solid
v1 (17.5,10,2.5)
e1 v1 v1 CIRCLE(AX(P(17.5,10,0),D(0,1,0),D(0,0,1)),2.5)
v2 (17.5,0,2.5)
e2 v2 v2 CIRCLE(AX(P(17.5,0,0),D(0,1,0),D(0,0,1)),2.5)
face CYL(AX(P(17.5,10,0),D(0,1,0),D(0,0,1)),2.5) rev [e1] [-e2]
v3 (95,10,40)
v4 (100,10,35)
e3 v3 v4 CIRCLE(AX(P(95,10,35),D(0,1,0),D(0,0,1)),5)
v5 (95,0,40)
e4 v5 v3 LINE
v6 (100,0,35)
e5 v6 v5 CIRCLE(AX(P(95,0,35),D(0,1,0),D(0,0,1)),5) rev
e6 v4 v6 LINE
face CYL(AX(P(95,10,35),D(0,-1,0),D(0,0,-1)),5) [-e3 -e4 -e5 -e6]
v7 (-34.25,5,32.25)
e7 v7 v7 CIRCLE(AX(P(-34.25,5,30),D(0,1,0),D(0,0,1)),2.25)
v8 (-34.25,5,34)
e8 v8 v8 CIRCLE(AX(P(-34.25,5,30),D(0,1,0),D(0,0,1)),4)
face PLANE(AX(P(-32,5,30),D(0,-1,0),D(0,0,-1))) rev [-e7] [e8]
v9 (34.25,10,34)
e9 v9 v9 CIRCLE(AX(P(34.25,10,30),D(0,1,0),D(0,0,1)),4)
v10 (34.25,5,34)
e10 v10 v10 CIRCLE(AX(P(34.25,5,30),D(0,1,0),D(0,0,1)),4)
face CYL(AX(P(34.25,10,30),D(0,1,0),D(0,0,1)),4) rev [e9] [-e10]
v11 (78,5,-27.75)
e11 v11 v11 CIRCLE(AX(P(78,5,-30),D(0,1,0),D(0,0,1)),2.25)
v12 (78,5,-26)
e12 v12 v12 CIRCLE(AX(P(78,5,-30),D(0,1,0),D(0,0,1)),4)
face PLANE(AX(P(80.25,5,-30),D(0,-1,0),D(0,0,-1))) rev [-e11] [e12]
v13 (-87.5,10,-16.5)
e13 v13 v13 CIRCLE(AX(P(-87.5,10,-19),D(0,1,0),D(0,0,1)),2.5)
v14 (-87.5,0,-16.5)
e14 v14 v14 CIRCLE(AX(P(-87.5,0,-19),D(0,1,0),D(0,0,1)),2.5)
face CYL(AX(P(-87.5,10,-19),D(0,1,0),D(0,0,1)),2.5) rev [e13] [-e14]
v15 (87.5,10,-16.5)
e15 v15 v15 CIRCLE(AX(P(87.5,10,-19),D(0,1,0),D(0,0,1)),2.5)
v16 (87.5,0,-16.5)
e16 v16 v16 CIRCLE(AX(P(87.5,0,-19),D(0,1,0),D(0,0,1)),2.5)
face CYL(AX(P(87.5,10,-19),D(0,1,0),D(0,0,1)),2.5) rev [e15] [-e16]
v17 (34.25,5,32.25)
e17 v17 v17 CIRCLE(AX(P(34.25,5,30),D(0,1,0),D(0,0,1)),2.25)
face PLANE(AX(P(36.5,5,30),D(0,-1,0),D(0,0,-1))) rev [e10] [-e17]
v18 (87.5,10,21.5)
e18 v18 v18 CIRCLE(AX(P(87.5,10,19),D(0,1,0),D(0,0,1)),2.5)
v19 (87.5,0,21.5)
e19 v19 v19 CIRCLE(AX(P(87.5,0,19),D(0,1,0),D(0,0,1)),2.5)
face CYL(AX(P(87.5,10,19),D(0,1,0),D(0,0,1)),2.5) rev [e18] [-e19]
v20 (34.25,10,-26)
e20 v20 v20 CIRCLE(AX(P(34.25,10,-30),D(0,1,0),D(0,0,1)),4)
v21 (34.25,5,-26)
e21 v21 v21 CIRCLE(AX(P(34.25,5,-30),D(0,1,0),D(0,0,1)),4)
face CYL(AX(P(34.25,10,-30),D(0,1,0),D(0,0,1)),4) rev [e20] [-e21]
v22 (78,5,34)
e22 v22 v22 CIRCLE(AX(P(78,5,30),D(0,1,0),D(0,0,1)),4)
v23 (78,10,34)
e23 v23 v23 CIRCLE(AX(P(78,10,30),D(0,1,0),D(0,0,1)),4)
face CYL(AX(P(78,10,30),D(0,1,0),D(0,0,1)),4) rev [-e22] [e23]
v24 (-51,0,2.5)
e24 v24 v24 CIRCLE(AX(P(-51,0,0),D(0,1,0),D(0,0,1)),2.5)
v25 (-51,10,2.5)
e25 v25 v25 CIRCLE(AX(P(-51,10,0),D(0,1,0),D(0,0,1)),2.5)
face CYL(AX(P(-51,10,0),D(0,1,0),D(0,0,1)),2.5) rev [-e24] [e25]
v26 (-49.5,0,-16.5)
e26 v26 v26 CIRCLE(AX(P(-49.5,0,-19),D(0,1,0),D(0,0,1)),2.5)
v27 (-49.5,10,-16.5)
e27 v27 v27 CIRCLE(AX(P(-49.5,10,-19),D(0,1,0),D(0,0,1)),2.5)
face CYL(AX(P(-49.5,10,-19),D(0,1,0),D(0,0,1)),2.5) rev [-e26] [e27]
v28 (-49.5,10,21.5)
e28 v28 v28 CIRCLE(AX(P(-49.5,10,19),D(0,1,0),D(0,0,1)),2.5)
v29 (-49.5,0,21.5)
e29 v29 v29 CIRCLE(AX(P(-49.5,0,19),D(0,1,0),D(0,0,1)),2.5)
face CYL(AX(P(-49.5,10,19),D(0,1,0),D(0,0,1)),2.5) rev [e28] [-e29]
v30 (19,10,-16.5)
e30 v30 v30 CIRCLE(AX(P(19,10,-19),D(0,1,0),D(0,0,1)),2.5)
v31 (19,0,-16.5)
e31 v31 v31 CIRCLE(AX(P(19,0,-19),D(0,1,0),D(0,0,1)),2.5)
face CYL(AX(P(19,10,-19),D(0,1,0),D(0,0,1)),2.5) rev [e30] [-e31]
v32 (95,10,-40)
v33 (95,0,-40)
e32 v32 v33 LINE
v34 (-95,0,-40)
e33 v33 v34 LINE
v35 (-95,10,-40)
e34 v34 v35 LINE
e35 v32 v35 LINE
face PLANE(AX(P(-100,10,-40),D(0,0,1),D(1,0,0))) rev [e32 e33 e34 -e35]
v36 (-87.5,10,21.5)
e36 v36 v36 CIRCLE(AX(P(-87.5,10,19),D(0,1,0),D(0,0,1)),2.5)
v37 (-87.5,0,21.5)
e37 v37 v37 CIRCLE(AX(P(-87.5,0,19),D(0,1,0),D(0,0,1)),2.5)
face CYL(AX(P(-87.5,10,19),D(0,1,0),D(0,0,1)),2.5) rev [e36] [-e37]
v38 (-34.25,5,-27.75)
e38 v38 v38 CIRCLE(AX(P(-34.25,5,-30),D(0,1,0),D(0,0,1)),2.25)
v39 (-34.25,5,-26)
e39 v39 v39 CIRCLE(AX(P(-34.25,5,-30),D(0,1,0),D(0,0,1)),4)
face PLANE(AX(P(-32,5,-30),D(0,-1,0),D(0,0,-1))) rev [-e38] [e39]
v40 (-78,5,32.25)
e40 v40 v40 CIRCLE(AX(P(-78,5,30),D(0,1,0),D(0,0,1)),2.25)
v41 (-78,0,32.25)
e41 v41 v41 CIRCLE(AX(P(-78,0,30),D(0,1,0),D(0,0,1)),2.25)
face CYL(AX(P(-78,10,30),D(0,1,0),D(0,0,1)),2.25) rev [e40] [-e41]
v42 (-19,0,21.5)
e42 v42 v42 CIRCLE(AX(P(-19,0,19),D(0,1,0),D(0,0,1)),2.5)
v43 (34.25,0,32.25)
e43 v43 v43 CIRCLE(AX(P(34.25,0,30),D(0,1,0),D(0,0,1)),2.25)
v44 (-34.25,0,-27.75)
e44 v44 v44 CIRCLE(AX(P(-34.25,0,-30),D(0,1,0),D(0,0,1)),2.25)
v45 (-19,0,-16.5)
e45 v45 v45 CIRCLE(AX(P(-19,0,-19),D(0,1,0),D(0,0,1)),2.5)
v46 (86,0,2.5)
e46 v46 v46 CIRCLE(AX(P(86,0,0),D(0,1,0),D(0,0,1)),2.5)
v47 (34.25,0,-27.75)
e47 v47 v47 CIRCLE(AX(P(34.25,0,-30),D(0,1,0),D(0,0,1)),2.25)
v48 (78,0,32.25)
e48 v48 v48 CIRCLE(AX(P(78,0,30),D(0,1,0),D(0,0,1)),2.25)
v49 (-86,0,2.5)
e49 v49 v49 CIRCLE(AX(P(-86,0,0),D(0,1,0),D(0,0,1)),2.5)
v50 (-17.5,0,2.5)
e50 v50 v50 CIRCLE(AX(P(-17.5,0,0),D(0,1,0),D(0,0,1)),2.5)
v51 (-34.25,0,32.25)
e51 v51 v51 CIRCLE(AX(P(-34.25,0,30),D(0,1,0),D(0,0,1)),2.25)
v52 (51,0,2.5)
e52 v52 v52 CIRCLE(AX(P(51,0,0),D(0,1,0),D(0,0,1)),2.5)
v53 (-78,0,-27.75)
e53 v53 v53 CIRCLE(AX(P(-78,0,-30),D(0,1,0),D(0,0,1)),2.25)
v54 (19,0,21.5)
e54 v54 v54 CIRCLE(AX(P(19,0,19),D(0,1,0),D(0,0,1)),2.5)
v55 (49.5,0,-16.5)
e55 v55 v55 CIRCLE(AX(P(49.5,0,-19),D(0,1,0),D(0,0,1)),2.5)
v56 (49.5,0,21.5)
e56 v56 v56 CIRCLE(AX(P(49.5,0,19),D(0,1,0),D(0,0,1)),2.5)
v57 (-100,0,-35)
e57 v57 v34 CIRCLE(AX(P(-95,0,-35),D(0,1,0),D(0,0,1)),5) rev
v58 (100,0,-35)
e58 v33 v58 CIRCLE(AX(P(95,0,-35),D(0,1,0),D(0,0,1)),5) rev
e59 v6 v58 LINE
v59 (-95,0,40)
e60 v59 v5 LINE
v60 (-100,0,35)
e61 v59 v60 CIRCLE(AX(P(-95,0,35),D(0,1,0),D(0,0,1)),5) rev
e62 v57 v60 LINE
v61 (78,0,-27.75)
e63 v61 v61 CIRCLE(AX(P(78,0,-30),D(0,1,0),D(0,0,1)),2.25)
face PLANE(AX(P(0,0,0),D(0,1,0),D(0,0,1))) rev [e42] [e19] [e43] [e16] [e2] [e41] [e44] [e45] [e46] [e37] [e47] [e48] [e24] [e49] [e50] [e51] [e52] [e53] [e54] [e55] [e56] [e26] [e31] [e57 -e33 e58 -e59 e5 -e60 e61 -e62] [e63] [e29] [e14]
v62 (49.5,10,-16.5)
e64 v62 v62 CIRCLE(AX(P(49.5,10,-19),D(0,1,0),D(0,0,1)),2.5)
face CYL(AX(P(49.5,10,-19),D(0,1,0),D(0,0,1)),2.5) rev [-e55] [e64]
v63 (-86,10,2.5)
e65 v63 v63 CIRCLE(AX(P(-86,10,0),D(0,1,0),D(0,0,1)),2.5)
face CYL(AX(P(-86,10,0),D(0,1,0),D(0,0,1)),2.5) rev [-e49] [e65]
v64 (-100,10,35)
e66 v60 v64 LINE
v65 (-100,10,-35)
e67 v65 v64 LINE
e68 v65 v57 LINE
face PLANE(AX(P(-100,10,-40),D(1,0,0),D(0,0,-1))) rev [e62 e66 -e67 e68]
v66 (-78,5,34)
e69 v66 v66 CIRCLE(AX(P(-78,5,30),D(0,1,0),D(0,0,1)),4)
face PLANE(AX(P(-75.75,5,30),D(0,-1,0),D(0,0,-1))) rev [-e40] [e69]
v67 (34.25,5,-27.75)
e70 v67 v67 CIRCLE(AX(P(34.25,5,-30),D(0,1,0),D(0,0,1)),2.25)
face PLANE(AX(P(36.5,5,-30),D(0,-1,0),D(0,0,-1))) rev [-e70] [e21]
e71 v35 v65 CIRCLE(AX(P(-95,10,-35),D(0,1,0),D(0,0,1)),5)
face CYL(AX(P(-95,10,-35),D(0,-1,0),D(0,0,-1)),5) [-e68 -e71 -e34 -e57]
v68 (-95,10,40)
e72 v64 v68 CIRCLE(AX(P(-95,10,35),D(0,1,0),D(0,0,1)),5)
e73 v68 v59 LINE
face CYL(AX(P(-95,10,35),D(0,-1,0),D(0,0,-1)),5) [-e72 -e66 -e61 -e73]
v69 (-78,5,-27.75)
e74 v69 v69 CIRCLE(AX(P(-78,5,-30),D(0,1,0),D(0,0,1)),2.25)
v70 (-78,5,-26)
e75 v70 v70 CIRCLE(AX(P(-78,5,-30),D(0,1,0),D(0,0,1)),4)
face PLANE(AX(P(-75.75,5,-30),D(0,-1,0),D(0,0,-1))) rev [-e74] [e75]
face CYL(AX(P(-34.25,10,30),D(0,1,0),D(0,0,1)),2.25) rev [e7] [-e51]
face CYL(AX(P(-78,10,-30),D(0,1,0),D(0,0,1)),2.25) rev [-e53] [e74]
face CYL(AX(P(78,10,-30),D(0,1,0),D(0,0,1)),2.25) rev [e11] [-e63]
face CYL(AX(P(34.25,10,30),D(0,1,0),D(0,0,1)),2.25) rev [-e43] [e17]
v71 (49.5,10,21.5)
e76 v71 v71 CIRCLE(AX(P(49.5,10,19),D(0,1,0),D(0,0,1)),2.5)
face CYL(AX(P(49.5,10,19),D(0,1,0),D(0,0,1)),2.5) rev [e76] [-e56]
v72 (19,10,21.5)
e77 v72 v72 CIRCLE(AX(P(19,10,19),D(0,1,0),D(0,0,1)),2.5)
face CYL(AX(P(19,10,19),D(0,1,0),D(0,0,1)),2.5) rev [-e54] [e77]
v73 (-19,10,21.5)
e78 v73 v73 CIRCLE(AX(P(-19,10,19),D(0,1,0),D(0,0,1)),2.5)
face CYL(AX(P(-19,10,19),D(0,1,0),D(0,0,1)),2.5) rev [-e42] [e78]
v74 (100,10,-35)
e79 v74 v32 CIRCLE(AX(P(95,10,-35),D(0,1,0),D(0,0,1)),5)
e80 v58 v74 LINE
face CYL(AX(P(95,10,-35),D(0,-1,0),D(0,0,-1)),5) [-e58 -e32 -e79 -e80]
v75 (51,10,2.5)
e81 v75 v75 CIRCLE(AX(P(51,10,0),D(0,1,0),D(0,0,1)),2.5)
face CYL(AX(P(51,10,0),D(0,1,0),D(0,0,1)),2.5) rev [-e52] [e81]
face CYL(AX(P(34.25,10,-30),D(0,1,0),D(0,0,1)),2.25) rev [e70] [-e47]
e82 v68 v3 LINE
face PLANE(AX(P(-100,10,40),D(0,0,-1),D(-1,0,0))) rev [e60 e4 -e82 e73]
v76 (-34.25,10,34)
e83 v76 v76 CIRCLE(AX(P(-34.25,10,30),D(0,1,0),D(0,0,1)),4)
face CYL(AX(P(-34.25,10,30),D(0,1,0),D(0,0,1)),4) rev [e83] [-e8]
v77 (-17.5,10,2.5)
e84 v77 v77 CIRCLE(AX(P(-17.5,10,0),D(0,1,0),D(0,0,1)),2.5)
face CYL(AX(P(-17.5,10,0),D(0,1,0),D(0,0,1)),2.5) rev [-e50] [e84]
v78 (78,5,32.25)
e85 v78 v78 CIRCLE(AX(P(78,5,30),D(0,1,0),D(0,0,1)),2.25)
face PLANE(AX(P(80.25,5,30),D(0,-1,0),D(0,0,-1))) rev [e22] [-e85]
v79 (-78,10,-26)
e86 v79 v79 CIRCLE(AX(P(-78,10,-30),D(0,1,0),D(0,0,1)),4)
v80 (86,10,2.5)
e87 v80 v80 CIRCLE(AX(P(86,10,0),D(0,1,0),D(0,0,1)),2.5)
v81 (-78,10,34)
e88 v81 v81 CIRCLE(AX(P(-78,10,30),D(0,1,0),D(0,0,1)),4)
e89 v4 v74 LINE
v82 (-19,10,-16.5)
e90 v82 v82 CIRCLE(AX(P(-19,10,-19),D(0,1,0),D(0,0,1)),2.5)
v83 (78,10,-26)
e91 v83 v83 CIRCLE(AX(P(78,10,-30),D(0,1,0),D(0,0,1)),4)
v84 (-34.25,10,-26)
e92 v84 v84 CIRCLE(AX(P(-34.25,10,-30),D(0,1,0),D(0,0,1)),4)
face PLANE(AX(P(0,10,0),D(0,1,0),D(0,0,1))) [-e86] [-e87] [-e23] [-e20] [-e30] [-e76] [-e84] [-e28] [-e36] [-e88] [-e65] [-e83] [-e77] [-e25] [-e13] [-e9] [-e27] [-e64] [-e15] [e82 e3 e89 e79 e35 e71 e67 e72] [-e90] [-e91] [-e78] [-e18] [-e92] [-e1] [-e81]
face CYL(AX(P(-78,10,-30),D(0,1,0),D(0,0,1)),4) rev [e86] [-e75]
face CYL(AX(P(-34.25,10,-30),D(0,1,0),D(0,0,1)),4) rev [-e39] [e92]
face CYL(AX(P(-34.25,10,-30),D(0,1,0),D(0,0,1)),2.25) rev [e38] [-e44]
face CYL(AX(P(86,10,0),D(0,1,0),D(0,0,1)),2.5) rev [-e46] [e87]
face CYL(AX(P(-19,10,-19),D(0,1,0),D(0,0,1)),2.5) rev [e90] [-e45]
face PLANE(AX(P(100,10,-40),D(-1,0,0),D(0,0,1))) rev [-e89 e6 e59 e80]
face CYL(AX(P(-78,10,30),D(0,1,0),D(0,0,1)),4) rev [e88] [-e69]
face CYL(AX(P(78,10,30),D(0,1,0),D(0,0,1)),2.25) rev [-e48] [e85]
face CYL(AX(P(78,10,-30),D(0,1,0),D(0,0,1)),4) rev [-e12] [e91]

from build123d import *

# Parameters (mm, degrees)
SKETCH1_W               = 200
SKETCH1_H               = 80
BOSS_EXTRUDE1_DEPTH     = 10
FILLET1_R               = 5
OTHER_D10_OUTLINE_R     = 2.5
OTHER_D10_OUTLINE_R_2   = 2.25
OTHER_D10_DEPTH         = 10
OTHER_START             = 5
OTHER_D10_2_OUTLINE_R   = 4
OTHER_D10_2_OUTLINE_R_2 = 2.25
OTHER_D10_2_DEPTH       = 5


# Read off the part's stored shape, not the designer's step: the other step
with BuildPart() as part:
    # Sketch1 → Boss-Extrude1 (new body)
    with BuildSketch(Plane(origin=(0, 0, 0), x_dir=(1, 0, 0), z_dir=(0, 1, 0))):
        Rectangle(SKETCH1_W, SKETCH1_H)
    extrude(amount=BOSS_EXTRUDE1_DEPTH)

    # Fillet1
    fillet1_edges = [part.edges().sort_by_distance(p)[0] for p in [
        (-100, 5, -40),
        (100, 5, -40),
        (100, 5, 40),
        (-100, 5, 40),
    ]]
    fillet(fillet1_edges, radius=FILLET1_R)

    # Other D10 outline → Other D10 (cut)
    with BuildSketch(Plane(origin=(0, 0, 0), x_dir=(1, 0, 0), z_dir=(0, 1, 0))):
        with Locations((17.5, 0)):
            Circle(OTHER_D10_OUTLINE_R)
        with Locations((-17.5, 0)):
            Circle(OTHER_D10_OUTLINE_R)
        with Locations((-19, -19)):
            Circle(OTHER_D10_OUTLINE_R)
        with Locations((19, -19)):
            Circle(OTHER_D10_OUTLINE_R)
        with Locations((19, 19)):
            Circle(OTHER_D10_OUTLINE_R)
        with Locations((-19, 19)):
            Circle(OTHER_D10_OUTLINE_R)
        with Locations((-86, 0)):
            Circle(OTHER_D10_OUTLINE_R)
        with Locations((86, 0)):
            Circle(OTHER_D10_OUTLINE_R)
        with Locations((51, 0)):
            Circle(OTHER_D10_OUTLINE_R)
        with Locations((-51, 0)):
            Circle(OTHER_D10_OUTLINE_R)
        with Locations((49.5, -19)):
            Circle(OTHER_D10_OUTLINE_R)
        with Locations((49.5, 19)):
            Circle(OTHER_D10_OUTLINE_R)
        with Locations((-49.5, -19)):
            Circle(OTHER_D10_OUTLINE_R)
        with Locations((-49.5, 19)):
            Circle(OTHER_D10_OUTLINE_R)
        with Locations((87.5, -19)):
            Circle(OTHER_D10_OUTLINE_R)
        with Locations((87.5, 19)):
            Circle(OTHER_D10_OUTLINE_R)
        with Locations((-87.5, -19)):
            Circle(OTHER_D10_OUTLINE_R)
        with Locations((-87.5, 19)):
            Circle(OTHER_D10_OUTLINE_R)
        with Locations((-78, -30)):
            Circle(OTHER_D10_OUTLINE_R_2)
        with Locations((-78, 30)):
            Circle(OTHER_D10_OUTLINE_R_2)
        with Locations((78, -30)):
            Circle(OTHER_D10_OUTLINE_R_2)
        with Locations((78, 30)):
            Circle(OTHER_D10_OUTLINE_R_2)
        with Locations((-34.25, -30)):
            Circle(OTHER_D10_OUTLINE_R_2)
        with Locations((34.25, -30)):
            Circle(OTHER_D10_OUTLINE_R_2)
        with Locations((34.25, 30)):
            Circle(OTHER_D10_OUTLINE_R_2)
        with Locations((-34.25, 30)):
            Circle(OTHER_D10_OUTLINE_R_2)
    extrude(amount=OTHER_D10_DEPTH, mode=Mode.SUBTRACT)

    # Other D10 2 outline → Other D10 2 (cut)
    # profile 1 of 8: a face of its own
    with BuildSketch(Plane(origin=(0, 0, 0), x_dir=(1, 0, 0), z_dir=(0, 1, 0)).offset(OTHER_START)):
        with Locations((-78, -30)):
            Circle(OTHER_D10_2_OUTLINE_R)
        with Locations((-78, -30)):
            Circle(OTHER_D10_2_OUTLINE_R_2, mode=Mode.SUBTRACT)
    # profile 2 of 8: a face of its own
    with BuildSketch(Plane(origin=(0, 0, 0), x_dir=(1, 0, 0), z_dir=(0, 1, 0)).offset(OTHER_START)):
        with Locations((-78, 30)):
            Circle(OTHER_D10_2_OUTLINE_R)
        with Locations((-78, 30)):
            Circle(OTHER_D10_2_OUTLINE_R_2, mode=Mode.SUBTRACT)
    # profile 3 of 8: a face of its own
    with BuildSketch(Plane(origin=(0, 0, 0), x_dir=(1, 0, 0), z_dir=(0, 1, 0)).offset(OTHER_START)):
        with Locations((78, -30)):
            Circle(OTHER_D10_2_OUTLINE_R)
        with Locations((78, -30)):
            Circle(OTHER_D10_2_OUTLINE_R_2, mode=Mode.SUBTRACT)
    # profile 4 of 8: a face of its own
    with BuildSketch(Plane(origin=(0, 0, 0), x_dir=(1, 0, 0), z_dir=(0, 1, 0)).offset(OTHER_START)):
        with Locations((78, 30)):
            Circle(OTHER_D10_2_OUTLINE_R)
        with Locations((78, 30)):
            Circle(OTHER_D10_2_OUTLINE_R_2, mode=Mode.SUBTRACT)
    # profile 5 of 8: a face of its own
    with BuildSketch(Plane(origin=(0, 0, 0), x_dir=(1, 0, 0), z_dir=(0, 1, 0)).offset(OTHER_START)):
        with Locations((-34.25, -30)):
            Circle(OTHER_D10_2_OUTLINE_R)
        with Locations((-34.25, -30)):
            Circle(OTHER_D10_2_OUTLINE_R_2, mode=Mode.SUBTRACT)
    # profile 6 of 8: a face of its own
    with BuildSketch(Plane(origin=(0, 0, 0), x_dir=(1, 0, 0), z_dir=(0, 1, 0)).offset(OTHER_START)):
        with Locations((34.25, -30)):
            Circle(OTHER_D10_2_OUTLINE_R)
        with Locations((34.25, -30)):
            Circle(OTHER_D10_2_OUTLINE_R_2, mode=Mode.SUBTRACT)
    # profile 7 of 8: a face of its own
    with BuildSketch(Plane(origin=(0, 0, 0), x_dir=(1, 0, 0), z_dir=(0, 1, 0)).offset(OTHER_START)):
        with Locations((34.25, 30)):
            Circle(OTHER_D10_2_OUTLINE_R)
        with Locations((34.25, 30)):
            Circle(OTHER_D10_2_OUTLINE_R_2, mode=Mode.SUBTRACT)
    # profile 8 of 8: a face of its own
    with BuildSketch(Plane(origin=(0, 0, 0), x_dir=(1, 0, 0), z_dir=(0, 1, 0)).offset(OTHER_START)):
        with Locations((-34.25, 30)):
            Circle(OTHER_D10_2_OUTLINE_R)
        with Locations((-34.25, 30)):
            Circle(OTHER_D10_2_OUTLINE_R_2, mode=Mode.SUBTRACT)
    extrude(amount=OTHER_D10_2_DEPTH, mode=Mode.SUBTRACT)


solid = part.part
